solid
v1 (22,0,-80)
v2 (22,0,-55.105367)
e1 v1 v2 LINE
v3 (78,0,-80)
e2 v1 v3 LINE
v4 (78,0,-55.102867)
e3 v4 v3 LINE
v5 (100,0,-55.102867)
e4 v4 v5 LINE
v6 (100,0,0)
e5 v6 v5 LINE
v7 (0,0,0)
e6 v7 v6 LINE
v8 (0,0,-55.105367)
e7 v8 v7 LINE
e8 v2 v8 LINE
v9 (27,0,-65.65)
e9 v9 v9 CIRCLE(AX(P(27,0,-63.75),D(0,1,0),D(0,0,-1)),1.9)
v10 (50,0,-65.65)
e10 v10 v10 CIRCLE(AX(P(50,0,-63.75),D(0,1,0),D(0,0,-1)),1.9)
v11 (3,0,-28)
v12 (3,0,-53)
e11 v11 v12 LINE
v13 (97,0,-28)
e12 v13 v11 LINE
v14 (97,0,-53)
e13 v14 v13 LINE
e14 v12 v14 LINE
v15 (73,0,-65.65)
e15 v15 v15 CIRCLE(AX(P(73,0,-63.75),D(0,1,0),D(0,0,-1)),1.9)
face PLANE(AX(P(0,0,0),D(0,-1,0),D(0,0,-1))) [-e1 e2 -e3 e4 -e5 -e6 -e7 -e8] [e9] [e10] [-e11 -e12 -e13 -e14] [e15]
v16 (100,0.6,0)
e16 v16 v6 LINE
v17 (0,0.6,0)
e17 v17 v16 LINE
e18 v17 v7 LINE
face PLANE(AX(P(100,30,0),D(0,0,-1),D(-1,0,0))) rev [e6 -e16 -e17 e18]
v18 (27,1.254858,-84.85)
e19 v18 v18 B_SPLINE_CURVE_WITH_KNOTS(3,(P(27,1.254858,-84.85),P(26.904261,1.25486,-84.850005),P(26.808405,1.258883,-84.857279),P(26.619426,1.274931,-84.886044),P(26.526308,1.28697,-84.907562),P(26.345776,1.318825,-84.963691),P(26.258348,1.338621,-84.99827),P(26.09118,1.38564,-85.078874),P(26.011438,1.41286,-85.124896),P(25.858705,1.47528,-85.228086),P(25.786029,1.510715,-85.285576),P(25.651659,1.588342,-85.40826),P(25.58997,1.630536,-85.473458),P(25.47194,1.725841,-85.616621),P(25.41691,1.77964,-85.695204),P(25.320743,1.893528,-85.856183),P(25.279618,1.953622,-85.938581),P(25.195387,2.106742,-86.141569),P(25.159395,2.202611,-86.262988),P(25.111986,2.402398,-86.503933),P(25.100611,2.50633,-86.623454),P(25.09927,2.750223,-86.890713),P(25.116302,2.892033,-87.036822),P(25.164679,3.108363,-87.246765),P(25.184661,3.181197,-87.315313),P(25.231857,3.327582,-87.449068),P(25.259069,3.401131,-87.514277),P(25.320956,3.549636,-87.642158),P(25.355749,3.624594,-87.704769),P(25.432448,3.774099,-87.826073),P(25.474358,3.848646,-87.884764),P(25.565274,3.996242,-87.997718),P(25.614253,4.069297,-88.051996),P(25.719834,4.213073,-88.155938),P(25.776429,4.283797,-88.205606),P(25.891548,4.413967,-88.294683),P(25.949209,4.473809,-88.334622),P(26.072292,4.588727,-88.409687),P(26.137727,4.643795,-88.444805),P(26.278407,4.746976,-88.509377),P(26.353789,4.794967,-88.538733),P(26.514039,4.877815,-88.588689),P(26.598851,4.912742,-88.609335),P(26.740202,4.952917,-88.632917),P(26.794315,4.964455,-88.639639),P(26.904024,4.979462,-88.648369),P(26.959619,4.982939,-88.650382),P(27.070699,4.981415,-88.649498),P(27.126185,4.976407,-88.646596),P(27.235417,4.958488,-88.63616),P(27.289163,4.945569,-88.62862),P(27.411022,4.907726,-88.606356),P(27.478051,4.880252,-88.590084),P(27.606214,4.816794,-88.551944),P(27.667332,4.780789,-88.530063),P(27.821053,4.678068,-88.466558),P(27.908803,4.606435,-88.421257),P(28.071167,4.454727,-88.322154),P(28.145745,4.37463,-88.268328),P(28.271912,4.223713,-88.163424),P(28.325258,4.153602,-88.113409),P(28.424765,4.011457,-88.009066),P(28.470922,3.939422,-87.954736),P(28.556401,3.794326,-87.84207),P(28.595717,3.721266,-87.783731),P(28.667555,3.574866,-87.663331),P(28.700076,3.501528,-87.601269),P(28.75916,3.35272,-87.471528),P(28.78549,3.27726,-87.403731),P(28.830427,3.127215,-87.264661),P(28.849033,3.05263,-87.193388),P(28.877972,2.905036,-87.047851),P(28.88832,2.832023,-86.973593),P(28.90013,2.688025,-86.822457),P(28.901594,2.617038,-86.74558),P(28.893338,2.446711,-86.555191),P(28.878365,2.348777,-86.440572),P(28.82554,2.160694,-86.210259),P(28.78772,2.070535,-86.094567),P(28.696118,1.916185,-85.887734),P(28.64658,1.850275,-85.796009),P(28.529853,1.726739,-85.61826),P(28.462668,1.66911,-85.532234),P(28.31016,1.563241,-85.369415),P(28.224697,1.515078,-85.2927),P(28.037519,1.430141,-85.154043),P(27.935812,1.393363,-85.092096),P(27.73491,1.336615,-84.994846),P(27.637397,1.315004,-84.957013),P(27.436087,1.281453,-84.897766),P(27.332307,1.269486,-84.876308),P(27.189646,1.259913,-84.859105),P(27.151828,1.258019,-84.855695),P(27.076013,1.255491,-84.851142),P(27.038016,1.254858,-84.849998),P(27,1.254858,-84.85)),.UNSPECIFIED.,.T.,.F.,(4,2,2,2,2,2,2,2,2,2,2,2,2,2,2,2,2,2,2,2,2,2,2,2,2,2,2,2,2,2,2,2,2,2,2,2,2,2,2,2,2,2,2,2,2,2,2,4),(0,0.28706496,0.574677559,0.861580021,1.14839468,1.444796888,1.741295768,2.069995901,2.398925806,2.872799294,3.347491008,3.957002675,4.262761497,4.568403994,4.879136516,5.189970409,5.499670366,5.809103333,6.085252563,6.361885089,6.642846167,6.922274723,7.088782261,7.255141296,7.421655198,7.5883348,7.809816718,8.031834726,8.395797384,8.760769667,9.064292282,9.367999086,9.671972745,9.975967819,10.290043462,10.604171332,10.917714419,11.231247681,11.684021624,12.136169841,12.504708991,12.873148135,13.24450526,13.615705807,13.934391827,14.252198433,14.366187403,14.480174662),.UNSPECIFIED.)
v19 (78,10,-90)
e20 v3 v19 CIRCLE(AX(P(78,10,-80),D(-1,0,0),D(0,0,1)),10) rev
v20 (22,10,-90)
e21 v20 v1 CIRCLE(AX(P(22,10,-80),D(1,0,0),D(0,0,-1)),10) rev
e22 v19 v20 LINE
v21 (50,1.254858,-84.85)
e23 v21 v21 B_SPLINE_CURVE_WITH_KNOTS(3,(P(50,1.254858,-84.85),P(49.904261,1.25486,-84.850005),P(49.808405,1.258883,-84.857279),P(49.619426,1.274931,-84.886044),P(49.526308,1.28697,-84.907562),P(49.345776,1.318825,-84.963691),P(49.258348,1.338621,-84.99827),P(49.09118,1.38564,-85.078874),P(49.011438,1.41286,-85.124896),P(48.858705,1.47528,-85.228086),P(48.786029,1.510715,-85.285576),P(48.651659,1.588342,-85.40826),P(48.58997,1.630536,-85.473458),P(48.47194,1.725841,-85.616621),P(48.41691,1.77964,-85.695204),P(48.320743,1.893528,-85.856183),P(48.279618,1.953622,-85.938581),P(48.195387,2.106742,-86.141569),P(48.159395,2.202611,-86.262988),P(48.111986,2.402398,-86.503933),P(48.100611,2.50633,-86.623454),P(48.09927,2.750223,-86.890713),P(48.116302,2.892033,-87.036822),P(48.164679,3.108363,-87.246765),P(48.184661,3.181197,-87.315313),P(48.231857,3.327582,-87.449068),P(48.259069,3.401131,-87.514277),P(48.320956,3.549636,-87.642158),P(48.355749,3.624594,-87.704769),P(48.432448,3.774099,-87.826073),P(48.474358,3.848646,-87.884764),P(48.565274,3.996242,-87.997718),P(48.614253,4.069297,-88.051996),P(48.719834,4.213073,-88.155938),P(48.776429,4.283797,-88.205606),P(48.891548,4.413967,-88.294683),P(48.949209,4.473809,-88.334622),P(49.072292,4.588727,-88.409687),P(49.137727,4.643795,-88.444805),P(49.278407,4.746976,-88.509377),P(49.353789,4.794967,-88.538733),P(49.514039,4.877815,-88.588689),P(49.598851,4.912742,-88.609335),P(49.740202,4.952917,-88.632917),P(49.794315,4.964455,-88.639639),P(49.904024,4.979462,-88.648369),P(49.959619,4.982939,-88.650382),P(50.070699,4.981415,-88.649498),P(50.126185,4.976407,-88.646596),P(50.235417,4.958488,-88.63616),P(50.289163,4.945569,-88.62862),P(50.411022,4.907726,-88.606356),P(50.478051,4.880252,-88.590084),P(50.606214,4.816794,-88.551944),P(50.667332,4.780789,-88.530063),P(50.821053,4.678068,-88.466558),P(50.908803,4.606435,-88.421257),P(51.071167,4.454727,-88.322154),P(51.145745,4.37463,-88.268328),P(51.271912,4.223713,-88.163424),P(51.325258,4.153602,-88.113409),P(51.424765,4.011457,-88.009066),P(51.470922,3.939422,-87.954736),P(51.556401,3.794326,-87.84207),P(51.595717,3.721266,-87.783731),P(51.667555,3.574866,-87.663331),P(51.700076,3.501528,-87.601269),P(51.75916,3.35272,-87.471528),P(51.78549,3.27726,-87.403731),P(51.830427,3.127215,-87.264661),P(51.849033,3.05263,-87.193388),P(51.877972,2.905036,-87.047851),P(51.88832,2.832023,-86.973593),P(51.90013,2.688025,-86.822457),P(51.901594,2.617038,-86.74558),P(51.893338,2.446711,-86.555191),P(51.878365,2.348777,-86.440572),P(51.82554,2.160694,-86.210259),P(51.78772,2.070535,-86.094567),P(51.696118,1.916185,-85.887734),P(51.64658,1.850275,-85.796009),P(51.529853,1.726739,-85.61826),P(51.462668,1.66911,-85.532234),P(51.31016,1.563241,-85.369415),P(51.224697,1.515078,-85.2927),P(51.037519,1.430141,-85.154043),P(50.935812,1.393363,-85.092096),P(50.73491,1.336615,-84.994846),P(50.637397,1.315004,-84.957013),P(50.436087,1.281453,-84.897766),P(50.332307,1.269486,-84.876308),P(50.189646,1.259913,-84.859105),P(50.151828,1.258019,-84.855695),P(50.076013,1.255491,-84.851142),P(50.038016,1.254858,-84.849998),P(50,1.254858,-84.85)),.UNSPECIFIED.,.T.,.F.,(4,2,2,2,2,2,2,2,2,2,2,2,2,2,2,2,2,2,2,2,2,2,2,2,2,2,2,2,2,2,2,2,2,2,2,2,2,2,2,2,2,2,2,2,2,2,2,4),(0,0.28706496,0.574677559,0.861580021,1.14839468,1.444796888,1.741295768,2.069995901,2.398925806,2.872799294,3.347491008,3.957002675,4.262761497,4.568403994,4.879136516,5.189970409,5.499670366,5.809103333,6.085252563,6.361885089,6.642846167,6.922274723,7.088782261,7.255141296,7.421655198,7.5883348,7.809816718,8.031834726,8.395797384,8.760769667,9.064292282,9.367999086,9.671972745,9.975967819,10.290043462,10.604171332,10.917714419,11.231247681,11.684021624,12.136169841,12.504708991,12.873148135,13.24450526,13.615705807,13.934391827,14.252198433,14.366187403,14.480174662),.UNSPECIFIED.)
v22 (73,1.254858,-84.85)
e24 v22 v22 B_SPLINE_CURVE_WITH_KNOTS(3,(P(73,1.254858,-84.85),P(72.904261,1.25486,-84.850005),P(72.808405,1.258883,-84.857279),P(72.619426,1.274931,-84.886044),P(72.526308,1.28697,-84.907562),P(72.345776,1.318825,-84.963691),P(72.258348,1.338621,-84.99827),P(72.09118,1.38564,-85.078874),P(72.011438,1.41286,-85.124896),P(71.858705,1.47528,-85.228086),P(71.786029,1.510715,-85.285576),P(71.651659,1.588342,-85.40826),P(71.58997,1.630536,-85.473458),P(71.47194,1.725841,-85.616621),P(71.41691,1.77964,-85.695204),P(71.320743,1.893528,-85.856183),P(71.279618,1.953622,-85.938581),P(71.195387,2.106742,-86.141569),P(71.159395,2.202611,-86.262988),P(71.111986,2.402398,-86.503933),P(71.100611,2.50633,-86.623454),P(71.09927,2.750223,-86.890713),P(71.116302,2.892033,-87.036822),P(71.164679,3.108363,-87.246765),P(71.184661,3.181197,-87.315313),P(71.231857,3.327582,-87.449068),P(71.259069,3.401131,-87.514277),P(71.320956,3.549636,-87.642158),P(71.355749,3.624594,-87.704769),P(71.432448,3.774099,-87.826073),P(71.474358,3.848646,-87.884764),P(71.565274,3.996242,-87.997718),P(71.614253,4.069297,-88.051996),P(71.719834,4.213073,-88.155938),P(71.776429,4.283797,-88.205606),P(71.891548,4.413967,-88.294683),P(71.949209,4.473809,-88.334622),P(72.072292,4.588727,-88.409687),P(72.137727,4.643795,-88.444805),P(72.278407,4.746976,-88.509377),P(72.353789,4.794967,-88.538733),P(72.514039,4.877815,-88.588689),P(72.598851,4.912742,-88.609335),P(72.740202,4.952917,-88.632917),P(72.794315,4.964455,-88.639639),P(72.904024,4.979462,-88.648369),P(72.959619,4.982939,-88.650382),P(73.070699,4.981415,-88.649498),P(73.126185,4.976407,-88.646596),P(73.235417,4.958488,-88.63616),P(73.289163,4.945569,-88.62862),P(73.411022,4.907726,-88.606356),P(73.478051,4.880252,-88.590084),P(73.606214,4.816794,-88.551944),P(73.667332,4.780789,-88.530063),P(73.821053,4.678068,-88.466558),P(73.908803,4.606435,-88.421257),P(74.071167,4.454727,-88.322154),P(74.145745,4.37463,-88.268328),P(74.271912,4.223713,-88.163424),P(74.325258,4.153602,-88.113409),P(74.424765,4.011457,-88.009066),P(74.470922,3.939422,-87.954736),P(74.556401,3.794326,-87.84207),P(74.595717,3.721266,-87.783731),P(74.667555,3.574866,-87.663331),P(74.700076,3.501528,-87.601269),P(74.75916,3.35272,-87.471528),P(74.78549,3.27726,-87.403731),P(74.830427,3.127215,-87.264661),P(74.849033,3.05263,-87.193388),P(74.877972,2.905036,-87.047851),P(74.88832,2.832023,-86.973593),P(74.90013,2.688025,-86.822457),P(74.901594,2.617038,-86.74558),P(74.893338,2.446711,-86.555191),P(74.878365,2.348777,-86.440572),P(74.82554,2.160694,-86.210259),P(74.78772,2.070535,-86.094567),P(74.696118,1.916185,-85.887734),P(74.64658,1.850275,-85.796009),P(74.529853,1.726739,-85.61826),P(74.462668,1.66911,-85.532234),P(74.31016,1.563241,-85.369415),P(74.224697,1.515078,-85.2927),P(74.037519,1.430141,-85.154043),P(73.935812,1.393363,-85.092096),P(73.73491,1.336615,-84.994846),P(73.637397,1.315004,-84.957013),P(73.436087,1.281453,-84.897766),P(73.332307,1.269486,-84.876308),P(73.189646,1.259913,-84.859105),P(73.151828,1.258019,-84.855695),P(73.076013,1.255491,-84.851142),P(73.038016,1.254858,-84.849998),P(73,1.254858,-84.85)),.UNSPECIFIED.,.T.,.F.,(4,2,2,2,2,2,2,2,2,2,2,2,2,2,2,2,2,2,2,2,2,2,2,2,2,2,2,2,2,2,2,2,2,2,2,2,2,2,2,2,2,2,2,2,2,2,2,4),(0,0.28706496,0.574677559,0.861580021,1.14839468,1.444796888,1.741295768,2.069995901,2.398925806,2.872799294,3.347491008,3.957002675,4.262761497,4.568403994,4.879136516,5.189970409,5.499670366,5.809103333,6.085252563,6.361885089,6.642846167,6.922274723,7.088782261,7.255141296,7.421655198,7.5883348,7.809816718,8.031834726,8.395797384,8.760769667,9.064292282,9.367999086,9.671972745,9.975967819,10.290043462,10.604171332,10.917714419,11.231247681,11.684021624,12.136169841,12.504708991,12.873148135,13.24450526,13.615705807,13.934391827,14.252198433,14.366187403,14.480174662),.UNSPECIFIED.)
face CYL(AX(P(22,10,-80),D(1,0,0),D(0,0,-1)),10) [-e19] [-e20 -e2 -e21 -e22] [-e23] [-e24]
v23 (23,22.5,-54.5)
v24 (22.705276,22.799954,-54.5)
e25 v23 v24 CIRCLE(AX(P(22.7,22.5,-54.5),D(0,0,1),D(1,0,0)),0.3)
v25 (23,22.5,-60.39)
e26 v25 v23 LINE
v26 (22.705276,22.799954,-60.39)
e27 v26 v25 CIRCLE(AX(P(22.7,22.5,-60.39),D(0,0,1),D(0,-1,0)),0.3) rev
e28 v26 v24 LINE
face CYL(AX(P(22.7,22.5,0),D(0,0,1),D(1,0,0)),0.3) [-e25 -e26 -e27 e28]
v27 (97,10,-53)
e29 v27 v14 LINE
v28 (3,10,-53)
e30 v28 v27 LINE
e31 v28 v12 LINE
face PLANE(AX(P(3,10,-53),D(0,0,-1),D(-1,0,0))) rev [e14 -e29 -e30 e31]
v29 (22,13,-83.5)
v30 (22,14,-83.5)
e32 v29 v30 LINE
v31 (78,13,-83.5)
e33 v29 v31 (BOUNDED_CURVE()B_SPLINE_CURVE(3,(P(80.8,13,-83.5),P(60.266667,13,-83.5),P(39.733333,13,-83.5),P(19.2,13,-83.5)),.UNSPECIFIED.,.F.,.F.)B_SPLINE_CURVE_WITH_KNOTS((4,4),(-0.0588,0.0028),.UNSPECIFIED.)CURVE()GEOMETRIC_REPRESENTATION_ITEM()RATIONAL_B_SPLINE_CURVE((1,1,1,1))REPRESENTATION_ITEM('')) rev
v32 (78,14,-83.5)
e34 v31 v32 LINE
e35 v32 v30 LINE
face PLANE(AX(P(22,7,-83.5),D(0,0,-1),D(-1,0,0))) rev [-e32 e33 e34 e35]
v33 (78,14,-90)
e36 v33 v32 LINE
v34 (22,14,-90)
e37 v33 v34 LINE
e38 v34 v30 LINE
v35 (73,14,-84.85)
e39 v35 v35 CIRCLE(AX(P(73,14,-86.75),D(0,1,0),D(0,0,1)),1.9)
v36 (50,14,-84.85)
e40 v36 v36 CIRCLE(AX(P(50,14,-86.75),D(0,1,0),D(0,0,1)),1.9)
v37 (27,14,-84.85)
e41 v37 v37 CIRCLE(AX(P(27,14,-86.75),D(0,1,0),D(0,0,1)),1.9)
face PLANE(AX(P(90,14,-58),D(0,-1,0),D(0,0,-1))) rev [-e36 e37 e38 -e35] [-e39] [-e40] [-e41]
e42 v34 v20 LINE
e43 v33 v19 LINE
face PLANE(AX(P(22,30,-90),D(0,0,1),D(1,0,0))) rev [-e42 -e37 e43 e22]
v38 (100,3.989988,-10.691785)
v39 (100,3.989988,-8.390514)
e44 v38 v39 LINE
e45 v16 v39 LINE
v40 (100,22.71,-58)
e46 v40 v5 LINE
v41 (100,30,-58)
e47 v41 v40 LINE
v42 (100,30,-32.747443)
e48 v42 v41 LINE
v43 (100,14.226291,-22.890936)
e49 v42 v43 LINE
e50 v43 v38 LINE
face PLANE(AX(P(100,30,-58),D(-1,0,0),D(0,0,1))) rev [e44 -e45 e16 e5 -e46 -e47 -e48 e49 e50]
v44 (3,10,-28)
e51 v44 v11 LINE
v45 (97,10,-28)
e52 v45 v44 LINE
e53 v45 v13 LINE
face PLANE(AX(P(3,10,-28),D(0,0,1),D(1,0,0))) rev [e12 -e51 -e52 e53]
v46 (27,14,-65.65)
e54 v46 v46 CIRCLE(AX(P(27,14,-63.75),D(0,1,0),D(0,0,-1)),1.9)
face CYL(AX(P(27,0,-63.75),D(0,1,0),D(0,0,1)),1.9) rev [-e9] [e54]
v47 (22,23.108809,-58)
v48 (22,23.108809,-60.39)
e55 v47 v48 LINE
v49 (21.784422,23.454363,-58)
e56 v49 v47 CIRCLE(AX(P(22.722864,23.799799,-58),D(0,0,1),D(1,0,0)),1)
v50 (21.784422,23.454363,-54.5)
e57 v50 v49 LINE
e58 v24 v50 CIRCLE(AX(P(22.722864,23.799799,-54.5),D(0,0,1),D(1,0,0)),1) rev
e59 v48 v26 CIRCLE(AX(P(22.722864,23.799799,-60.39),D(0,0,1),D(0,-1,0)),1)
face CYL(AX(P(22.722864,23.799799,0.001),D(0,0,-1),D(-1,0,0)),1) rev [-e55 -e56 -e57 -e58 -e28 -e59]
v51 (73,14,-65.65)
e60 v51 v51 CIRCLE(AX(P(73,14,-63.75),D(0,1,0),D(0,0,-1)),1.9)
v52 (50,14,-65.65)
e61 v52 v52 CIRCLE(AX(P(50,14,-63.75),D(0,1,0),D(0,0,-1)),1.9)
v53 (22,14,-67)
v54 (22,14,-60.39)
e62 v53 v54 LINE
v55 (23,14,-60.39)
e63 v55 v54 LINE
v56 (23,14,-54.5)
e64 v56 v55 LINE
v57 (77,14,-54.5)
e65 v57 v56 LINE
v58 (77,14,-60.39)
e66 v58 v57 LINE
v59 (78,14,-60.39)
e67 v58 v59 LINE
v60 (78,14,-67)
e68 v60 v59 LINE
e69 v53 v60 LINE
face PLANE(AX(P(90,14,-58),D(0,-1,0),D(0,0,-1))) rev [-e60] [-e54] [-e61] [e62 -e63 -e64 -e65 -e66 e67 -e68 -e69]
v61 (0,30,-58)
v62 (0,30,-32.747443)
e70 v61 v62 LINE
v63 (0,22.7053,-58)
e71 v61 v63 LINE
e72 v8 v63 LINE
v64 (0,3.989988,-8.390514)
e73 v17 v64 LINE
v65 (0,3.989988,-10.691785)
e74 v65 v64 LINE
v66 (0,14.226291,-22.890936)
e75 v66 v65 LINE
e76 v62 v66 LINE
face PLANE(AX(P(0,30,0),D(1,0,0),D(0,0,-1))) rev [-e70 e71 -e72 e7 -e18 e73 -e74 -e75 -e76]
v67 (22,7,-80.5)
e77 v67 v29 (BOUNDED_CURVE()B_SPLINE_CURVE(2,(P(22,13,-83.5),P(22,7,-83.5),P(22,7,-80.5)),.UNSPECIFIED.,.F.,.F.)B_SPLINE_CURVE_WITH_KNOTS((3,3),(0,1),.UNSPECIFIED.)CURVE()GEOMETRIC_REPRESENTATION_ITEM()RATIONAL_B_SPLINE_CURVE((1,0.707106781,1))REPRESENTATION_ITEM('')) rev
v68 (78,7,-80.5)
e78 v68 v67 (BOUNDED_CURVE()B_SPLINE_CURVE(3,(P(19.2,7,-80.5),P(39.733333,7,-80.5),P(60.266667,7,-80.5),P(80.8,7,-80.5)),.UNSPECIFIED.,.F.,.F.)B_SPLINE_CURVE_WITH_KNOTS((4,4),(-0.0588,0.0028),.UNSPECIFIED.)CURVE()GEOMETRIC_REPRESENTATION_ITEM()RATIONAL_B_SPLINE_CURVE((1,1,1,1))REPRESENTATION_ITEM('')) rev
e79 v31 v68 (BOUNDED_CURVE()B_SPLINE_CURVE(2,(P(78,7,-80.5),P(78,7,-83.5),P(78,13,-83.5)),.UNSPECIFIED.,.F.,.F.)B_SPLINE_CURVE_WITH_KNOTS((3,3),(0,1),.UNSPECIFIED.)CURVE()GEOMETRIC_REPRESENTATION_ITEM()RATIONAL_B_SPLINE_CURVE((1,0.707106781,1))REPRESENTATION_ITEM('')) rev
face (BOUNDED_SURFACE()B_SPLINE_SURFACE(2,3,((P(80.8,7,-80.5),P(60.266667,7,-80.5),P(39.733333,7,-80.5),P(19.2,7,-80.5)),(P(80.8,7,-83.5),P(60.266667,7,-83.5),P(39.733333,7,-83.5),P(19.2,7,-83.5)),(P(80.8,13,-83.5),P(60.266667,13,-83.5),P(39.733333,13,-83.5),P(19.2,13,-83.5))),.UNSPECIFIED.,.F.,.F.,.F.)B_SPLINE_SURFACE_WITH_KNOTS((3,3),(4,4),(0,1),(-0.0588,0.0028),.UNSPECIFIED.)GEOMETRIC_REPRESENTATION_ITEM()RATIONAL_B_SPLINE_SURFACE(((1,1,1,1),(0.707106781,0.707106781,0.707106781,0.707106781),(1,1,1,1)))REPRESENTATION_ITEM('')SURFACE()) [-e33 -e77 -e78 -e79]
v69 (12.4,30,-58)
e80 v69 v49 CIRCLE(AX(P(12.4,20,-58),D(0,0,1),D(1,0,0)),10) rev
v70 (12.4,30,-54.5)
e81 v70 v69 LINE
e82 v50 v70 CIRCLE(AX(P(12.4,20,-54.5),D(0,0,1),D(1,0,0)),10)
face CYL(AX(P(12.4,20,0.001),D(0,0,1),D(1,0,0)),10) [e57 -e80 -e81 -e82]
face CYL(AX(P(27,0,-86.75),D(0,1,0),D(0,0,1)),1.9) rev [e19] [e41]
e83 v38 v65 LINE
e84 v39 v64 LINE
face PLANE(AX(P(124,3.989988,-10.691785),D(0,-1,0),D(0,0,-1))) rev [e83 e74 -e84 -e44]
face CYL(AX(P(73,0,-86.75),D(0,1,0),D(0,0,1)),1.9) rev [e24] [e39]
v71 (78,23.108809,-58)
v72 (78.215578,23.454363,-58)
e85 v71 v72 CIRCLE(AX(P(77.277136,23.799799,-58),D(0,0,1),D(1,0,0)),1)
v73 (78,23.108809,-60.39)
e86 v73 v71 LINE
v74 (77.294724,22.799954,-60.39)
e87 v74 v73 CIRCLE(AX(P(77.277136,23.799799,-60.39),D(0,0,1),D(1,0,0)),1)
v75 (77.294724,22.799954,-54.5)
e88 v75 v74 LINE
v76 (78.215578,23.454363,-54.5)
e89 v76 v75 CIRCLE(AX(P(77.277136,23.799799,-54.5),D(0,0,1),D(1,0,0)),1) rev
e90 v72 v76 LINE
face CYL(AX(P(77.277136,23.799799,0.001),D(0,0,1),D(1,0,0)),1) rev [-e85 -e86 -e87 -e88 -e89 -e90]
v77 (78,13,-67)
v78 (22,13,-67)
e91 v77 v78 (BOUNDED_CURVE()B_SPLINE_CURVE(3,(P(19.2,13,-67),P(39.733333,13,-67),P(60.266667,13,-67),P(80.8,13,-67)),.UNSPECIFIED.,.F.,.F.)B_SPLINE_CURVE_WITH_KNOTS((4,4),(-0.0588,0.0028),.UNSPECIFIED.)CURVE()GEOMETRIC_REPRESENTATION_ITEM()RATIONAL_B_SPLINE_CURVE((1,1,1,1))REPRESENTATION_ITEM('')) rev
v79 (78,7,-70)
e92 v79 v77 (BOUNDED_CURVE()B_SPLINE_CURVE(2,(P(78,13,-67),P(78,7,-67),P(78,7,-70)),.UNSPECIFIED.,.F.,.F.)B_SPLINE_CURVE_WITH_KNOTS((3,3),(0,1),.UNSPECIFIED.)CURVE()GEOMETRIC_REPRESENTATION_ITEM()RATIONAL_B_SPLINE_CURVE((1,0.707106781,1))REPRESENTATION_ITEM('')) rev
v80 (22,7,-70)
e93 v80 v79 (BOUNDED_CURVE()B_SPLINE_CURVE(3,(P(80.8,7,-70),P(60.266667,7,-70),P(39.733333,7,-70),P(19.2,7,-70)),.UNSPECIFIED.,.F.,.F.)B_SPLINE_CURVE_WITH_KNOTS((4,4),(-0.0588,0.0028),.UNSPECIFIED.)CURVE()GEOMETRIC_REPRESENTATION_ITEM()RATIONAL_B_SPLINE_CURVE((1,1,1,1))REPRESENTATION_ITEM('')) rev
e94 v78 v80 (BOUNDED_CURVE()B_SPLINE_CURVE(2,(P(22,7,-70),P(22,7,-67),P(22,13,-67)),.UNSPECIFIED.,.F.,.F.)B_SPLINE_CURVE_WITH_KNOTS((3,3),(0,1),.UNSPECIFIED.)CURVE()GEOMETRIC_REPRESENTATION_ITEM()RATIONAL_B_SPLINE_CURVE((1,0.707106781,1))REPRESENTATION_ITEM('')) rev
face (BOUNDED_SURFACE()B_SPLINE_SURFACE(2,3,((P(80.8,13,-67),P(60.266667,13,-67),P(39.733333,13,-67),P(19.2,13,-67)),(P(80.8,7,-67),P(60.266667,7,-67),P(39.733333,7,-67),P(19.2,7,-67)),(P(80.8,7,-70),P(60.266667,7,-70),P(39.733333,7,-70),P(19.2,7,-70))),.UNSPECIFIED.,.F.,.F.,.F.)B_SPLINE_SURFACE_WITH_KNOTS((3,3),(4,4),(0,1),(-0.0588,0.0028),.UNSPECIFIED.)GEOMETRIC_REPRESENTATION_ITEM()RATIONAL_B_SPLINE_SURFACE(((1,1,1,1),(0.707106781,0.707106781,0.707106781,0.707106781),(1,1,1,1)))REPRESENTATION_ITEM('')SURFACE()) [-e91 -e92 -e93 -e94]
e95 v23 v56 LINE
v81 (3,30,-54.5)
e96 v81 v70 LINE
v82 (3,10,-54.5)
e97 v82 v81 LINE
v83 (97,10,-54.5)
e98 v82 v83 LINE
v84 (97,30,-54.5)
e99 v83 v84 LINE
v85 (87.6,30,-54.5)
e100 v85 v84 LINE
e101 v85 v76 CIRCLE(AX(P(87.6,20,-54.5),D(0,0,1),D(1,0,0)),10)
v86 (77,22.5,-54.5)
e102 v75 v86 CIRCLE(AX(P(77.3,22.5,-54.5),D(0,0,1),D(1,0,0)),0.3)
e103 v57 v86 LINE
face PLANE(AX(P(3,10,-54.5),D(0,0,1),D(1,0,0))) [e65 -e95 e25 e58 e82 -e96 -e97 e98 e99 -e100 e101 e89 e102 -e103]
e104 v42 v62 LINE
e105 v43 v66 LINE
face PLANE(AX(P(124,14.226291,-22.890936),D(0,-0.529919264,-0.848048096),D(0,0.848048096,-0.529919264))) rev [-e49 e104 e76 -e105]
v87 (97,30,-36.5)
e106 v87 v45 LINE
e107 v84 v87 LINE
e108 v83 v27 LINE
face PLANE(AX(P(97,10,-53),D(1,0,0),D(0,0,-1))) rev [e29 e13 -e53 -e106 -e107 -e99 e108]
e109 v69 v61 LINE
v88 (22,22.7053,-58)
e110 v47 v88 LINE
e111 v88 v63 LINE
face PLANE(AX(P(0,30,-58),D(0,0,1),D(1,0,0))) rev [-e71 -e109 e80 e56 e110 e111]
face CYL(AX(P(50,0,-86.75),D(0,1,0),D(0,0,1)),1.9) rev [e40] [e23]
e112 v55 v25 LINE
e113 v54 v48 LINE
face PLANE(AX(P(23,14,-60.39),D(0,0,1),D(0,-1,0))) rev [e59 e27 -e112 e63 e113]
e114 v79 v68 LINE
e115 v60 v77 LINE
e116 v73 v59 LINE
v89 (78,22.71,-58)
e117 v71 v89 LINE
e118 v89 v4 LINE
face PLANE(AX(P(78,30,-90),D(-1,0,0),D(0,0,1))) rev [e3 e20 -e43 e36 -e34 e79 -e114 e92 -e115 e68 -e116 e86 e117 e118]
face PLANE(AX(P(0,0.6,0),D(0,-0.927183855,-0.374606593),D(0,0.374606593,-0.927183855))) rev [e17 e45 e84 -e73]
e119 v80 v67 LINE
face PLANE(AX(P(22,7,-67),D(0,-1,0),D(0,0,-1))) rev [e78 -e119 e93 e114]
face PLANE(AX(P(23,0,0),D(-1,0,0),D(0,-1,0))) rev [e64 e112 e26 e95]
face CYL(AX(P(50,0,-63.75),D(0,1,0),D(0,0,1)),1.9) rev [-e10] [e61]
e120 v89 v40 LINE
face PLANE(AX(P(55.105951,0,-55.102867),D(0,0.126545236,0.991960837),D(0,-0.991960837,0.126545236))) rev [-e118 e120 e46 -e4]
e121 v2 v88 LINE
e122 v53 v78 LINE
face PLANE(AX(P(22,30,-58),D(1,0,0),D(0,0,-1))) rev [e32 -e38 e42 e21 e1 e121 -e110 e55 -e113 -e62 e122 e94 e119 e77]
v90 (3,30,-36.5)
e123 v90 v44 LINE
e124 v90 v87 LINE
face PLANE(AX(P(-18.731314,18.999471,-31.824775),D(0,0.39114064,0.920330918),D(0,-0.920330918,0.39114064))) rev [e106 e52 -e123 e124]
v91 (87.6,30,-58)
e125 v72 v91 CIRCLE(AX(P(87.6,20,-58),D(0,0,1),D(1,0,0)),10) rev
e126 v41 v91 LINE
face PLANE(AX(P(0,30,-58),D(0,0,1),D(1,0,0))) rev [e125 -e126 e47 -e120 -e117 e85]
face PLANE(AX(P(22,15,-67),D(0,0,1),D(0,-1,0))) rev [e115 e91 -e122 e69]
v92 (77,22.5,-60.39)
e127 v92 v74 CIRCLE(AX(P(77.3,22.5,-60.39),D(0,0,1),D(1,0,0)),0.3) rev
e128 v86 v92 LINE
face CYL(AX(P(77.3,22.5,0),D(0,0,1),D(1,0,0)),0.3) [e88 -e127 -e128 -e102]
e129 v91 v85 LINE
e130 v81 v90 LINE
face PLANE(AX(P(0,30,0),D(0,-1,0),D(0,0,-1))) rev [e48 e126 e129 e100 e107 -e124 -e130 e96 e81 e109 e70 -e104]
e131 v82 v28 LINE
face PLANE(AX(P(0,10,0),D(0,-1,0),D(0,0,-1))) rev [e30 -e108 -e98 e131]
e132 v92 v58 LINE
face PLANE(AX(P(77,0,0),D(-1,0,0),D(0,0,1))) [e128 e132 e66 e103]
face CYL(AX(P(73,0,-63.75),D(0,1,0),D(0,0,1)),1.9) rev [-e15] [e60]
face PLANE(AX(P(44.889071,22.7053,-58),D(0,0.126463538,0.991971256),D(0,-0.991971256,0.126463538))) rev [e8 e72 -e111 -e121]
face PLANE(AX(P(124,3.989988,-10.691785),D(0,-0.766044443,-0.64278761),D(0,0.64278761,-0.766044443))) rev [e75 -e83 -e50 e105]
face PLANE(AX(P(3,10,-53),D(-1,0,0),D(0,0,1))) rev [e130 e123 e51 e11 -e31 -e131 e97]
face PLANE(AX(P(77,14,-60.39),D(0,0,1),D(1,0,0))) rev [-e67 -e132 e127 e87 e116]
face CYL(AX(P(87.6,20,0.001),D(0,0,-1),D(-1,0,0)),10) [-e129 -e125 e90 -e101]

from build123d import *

# Parameters (mm, degrees)
RESSALTO_EXTRUS_O1_DEPTH = 30
CORTE_EXTRUS_O1_DEPTH    = 100
ESBO_O4_W                = 94
ESBO_O4_H                = 25
CORTE_EXTRUS_O2_DEPTH    = 10
ESBO_O5_W                = 94
ESBO_O5_H                = 18
CORTE_EXTRUS_O3_DEPTH    = 20
CORTE_EXTRUS_O7_START    = -3
CORTE_EXTRUS_O7_DEPTH    = 94
ESBO_O8_W                = 32
ESBO_O8_H                = 15
CORTE_EXTRUS_O8_DEPTH    = 56
ESBO_O9_W                = 16.5
ESBO_O9_H                = 8
CORTE_EXTRUS_O9_DEPTH    = 56
FILETE1_SIZE             = 3
FILETE1_SIZE_2           = 6
FILETE2_SIZE             = 3
FILETE2_SIZE_2           = 6
FILETE3_R                = 10
ESBO_O12_W               = 32
ESBO_O12_H               = 1
CORTE_EXTRUS_O12_DEPTH   = 68
CORTE_EXTRUS_O13_REACH   = 121.432
ESBO_O14_W               = 56
ESBO_O14_H               = 16
CORTE_EXTRUS_O14_DEPTH   = 138.840487586
ESBO_O16_R               = 1.9
CORTE_EXTRUS_O15_DEPTH   = 136.484316502
ESBO_O19_W               = 5.89
ESBO_O19_H               = 8.8
RESSALTO_EXTRUS_O4_DEPTH = 1
ESBO_O20_W               = 5.89
ESBO_O20_H               = 8.8
RESSALTO_EXTRUS_O5_DEPTH = 1
FILETE5_R                = 10
FILETE6_R                = 0.3
FILETE7_R                = 1
CORTE_EXTRUS_O17_DEPTH   = 22
CORTE_EXTRUS_O18_DEPTH   = 22
CORTE_EXTRUS_O19_DEPTH   = 124


with BuildPart() as part:
    # Esboço2 → Ressalto-extrusão1 (new body)
    with BuildSketch(Plane(origin=(0, 0, 0), x_dir=(1, 0, 0), z_dir=(0, 1, 0))):
        Polygon((0, 0), (0, 58), (22, 58), (22, 90), (78, 90), (78, 58), (100, 58), (100, 0), align=None)
    extrude(amount=RESSALTO_EXTRUS_O1_DEPTH)

    # Esboço3 → Corte-extrusão1 (cut)
    with BuildSketch(Plane(origin=(100, 0, 0), x_dir=(0, 0, -1), z_dir=(1, 0, 0))):
        Polygon((0, 0.6), (9.828405069, 4.570933406), (22.126818959, 14.890527965), (31.568264957, 30), (0, 30), align=None)
    extrude(amount=-CORTE_EXTRUS_O1_DEPTH, mode=Mode.SUBTRACT)

    # Esboço4 → Corte-extrusão2 (cut)
    with BuildSketch(Plane.XZ):
        with Locations((50, -40.5)):
            Rectangle(ESBO_O4_W, ESBO_O4_H)
    extrude(amount=-CORTE_EXTRUS_O2_DEPTH, mode=Mode.SUBTRACT)

    # Esboço5 → Corte-extrusão3 (cut)
    with BuildSketch(Plane(origin=(0, 30, 0), x_dir=(1, 0, 0), z_dir=(0, 1, 0))):
        with Locations((50, 45.5)):
            Rectangle(ESBO_O5_W, ESBO_O5_H)
    extrude(amount=-CORTE_EXTRUS_O3_DEPTH, mode=Mode.SUBTRACT)

    # Esboço7 → Corte-extrusão7 (cut)
    with BuildSketch(Plane(origin=(100, 0, 0), x_dir=(0, 0, -1), z_dir=(1, 0, 0)).offset(CORTE_EXTRUS_O7_START)):
        Polygon((28, 10), (36.5, 30), (36.5, 10), align=None)
    extrude(amount=-CORTE_EXTRUS_O7_DEPTH, mode=Mode.SUBTRACT)

    # Esboço8 → Corte-extrusão8 (cut)
    with BuildSketch(Plane(origin=(78, 0, 0), x_dir=(0, 0, -1), z_dir=(1, 0, 0))):
        with Locations((74, 22.5)):
            Rectangle(ESBO_O8_W, ESBO_O8_H)
    extrude(amount=-CORTE_EXTRUS_O8_DEPTH, mode=Mode.SUBTRACT)

    # Esboço9 → Corte-extrusão9 (cut)
    with BuildSketch(Plane(origin=(78, 0, 0), x_dir=(0, 0, -1), z_dir=(1, 0, 0))):
        with Locations((75.25, 11)):
            Rectangle(ESBO_O9_W, ESBO_O9_H)
    extrude(amount=-CORTE_EXTRUS_O9_DEPTH, mode=Mode.SUBTRACT)

    # Filete1
    # an asymmetric fillet: 6, 3 mm, written as the material it adds along each edge
    with BuildSketch(Plane(origin=(78, 7, -67), x_dir=(0, 0, -1), z_dir=(-1, 0, 0))) as filete1_piece_1:
        with BuildLine():
            Bezier((FILETE1_SIZE, 0), (0, 0), (0, -FILETE1_SIZE_2), weights=[1, 0.707106781, 1])
            Line((0, -FILETE1_SIZE_2), (0, 0))
            Line((0, 0), (FILETE1_SIZE, 0))
        make_face()
    extrude(amount=56)

    # Filete2
    # an asymmetric fillet: 6, 3 mm, written as the material it adds along each edge
    with BuildSketch(Plane(origin=(78, 7, -83.5), x_dir=(0, 0, 1), z_dir=(-1, 0, 0))) as filete2_piece_1:
        with BuildLine():
            Bezier((FILETE2_SIZE, 0), (0, 0), (0, FILETE2_SIZE_2), weights=[1, 0.707106781, 1])
            Line((0, FILETE2_SIZE_2), (0, 0))
            Line((0, 0), (FILETE2_SIZE, 0))
        make_face()
    extrude(amount=56)

    # Filete3
    filete3_edges = [part.edges().sort_by_distance(p)[0] for p in [
        (50, 0, -90),
    ]]
    fillet(filete3_edges, radius=FILETE3_R)

    # Esboço12 → Corte-extrusão12 (cut)
    with BuildSketch(Plane.ZY.offset(-22)):
        with Locations((-74, 14.5)):
            Rectangle(ESBO_O12_W, ESBO_O12_H)
    extrude(amount=-CORTE_EXTRUS_O12_DEPTH, mode=Mode.SUBTRACT)

    # Esboço14 → Corte-extrusão13 (cut, up to next)
    with BuildSketch(Plane(origin=(0, 0, -58), x_dir=(-1, 0, 0), z_dir=(0, 0, -1)), mode=Mode.PRIVATE) as corte_extrus_o13_sk1:
        with Locations((-50, 22)):
            Rectangle(ESBO_O14_W, ESBO_O14_H)
    corte_extrus_o13_tool1 = extrude(corte_extrus_o13_sk1.sketch, amount=-CORTE_EXTRUS_O13_REACH, mode=Mode.PRIVATE) & part.part
    add(corte_extrus_o13_tool1.solids().sort_by_distance((50, 22, -58))[0], mode=Mode.SUBTRACT)

    # Esboço15 → Corte-extrusão14 (cut, through all)
    with BuildSketch(Plane(origin=(100, 0, 0), x_dir=(0, 0, -1), z_dir=(1, 0, 0))):
        Polygon((9.048997211, 4.256032191), (10.048997211, 4.256032191), (10.048997211, 4.756032191), align=None)
    extrude(amount=-CORTE_EXTRUS_O14_DEPTH, mode=Mode.SUBTRACT)

    # Esboço16 → Corte-extrusão15 (cut, through all)
    with BuildSketch(Plane(origin=(0, 14, 0), x_dir=(1, 0, 0), z_dir=(0, 1, 0))):
        with Locations(Location((73, 86.75, 0), (0, 0, 270))):
            Circle(ESBO_O16_R)
        with Locations(Location((27, 86.75, 0), (0, 0, 270))):
            Circle(ESBO_O16_R)
        with Locations(Location((73, 63.75, 0), (0, 0, 90))):
            Circle(ESBO_O16_R)
        with Locations(Location((27, 63.75, 0), (0, 0, 90))):
            Circle(ESBO_O16_R)
        with Locations(Location((50, 86.75, 0), (0, 0, 270))):
            Circle(ESBO_O16_R)
        with Locations(Location((50, 63.75, 0), (0, 0, 90))):
            Circle(ESBO_O16_R)
    extrude(amount=-CORTE_EXTRUS_O15_DEPTH, mode=Mode.SUBTRACT)

    # Esboço19 → Ressalto-extrusão4 (add)
    with BuildSketch(Plane.ZY.offset(-78)):
        with Locations((-57.445, 18.4)):
            Rectangle(ESBO_O19_W, ESBO_O19_H)
    extrude(amount=RESSALTO_EXTRUS_O4_DEPTH)

    # Esboço20 → Ressalto-extrusão5 (add)
    with BuildSketch(Plane(origin=(22, 0, 0), x_dir=(0, 0, -1), z_dir=(1, 0, 0))):
        with Locations((57.445, 18.4)):
            Rectangle(ESBO_O20_W, ESBO_O20_H)
    extrude(amount=RESSALTO_EXTRUS_O5_DEPTH)

    # Filete5
    # the kernel refuses this fillet: 10 mm, written as the material it takes off along each edge
    with BuildSketch(Plane(origin=(22, 30, -82), x_dir=(0, -1, 0), z_dir=(0, 0, 1))) as filete5_piece_1_section:
        with BuildLine():
            CenterArc((10, -9.6), FILETE5_R, 106.260204708, 73.739795292)
            Line((0, -9.6), (0, 0))
            Line((0, 0), (7.2, 0))
        make_face()
    filete5_piece_1 = extrude(amount=51.5, mode=Mode.PRIVATE)
    filete5_piece_1 = split(filete5_piece_1, bisect_by=Plane(origin=(18.412, 35.429115934, -38.807374272), z_dir=(0, -0.39114064034485163, -0.9203309184584747)), keep=Keep.TOP, mode=Mode.PRIVATE)
    add(filete5_piece_1, mode=Mode.SUBTRACT)
    with BuildSketch(Plane(origin=(78, 30, -82), x_dir=(0, -1, 0), z_dir=(0, 0, 1))) as filete5_piece_2_section:
        with BuildLine():
            CenterArc((10, 9.6), FILETE5_R, 180, 73.739795292)
            Line((0, 9.6), (0, 0))
            Line((0, 0), (7.2, 0))
        make_face()
    filete5_piece_2 = extrude(amount=51.5, mode=Mode.PRIVATE)
    filete5_piece_2 = split(filete5_piece_2, bisect_by=Plane(origin=(81.588, 35.429115934, -38.807374272), z_dir=(0, -0.39114064034485163, -0.9203309184584747)), keep=Keep.TOP, mode=Mode.PRIVATE)
    add(filete5_piece_2, mode=Mode.SUBTRACT)

    # Filete6
    filete6_edges = [part.edges().sort_by_distance(p)[0] for p in [
        (77, 22.8, -57.445),
        (23, 22.8, -57.445),
    ]]
    fillet(filete6_edges, radius=FILETE6_R)

    # Filete7
    # the kernel refuses this fillet: 1 mm, written as the material it adds along each edge
    with BuildSketch(Plane(origin=(22, 22.8, -62.231658327), x_dir=(0.9999999978354762, -6.579549656677086e-05, 0), z_dir=(0, 0, 1))) as filete7_piece_1_section:
        with BuildLine():
            CenterArc((0.722798557, 0.999846475), FILETE7_R, 200.212199082, 68.783803201)
            Line((-0.215620926, 0.654348465), (-0.309462874, 0.619798664))
            ThreePointArc((-0.309462874, 0.619798664), (-0.197149972, 0.297735075), (-0.095998158, -0.028006316))
            Line((-0.095998158, -0.028006316), (6.58e-06, -0.1))
            ThreePointArc((6.58e-06, -0.1), (0.700006578, -0.099953943), (0.703524171, -0.099984648))
            Line((0.703524171, -0.099984648), (0.705276388, 0))
        make_face()
    filete7_piece_1 = extrude(amount=7.731658327, mode=Mode.PRIVATE)
    filete7_piece_1 = split(filete7_piece_1, bisect_by=Plane(origin=(22.2637133, 22.819694308, -60.39), z_dir=(0, 0, 1)), keep=Keep.TOP, mode=Mode.PRIVATE)
    filete7_piece_1 = split(filete7_piece_1, bisect_by=Plane(origin=(22, 22.819694308, -59.195), z_dir=(1, 0, 0)), keep=Keep.TOP, mode=Mode.PRIVATE)
    filete7_piece_1 = split(filete7_piece_1, bisect_by=Plane(origin=(22.2637133, 22.819694308, -58), z_dir=(0, 0, -1)), keep=Keep.TOP, mode=Mode.PRIVATE)
    add(filete7_piece_1)
    with BuildSketch(Plane(origin=(22, 22.8, -58), x_dir=(0.9999999978354763, -6.579549656677353e-05, 0), z_dir=(0, 0, 1))) as filete7_piece_2_section:
        with BuildLine():
            CenterArc((0.722798557, 0.999846475), FILETE7_R, 200.212199082, 68.783803201)
            Line((-0.215620926, 0.654348465), (-0.309462874, 0.619798664))
            ThreePointArc((-0.309462874, 0.619798664), (-0.197149972, 0.297735075), (-0.095998158, -0.028006316))
            Line((-0.095998158, -0.028006316), (6.58e-06, -0.1))
            ThreePointArc((6.58e-06, -0.1), (0.700006578, -0.099953943), (0.703524171, -0.099984648))
            Line((0.703524171, -0.099984648), (0.705276388, 0))
        make_face()
    filete7_piece_2 = extrude(amount=3.5, mode=Mode.PRIVATE)
    filete7_piece_2 = split(filete7_piece_2, bisect_by=Plane(origin=(22, 22.819694308, -56.25), z_dir=(1, 0, 0)), keep=Keep.TOP, mode=Mode.PRIVATE)
    add(filete7_piece_2)
    with BuildSketch(Plane(origin=(22, 22.8, -58), x_dir=(0.9999999978354763, -6.579549656677353e-05, 0), z_dir=(0, 0, 1))) as filete7_piece_3_section:
        with BuildLine():
            CenterArc((0.722798557, 0.999846475), FILETE7_R, 200.212199082, 68.783803201)
            Line((-0.215620926, 0.654348465), (-0.309462874, 0.619798664))
            ThreePointArc((-0.309462874, 0.619798664), (-0.197149972, 0.297735075), (-0.095998158, -0.028006316))
            Line((-0.095998158, -0.028006316), (6.58e-06, -0.1))
            ThreePointArc((6.58e-06, -0.1), (0.700006578, -0.099953943), (0.703524171, -0.099984648))
            Line((0.703524171, -0.099984648), (0.705276388, 0))
        make_face()
    filete7_piece_3 = extrude(amount=3.5, mode=Mode.PRIVATE)
    filete7_piece_3 = split(filete7_piece_3, bisect_by=Plane(origin=(22, 23.088269834, -56.25), z_dir=(-1, 0, 0)), keep=Keep.TOP, mode=Mode.PRIVATE)
    add(filete7_piece_3)
    with BuildSketch(Plane(origin=(78, 22.8, -62.231658327), x_dir=(-0.9999999978354763, -6.579549656677353e-05, 0), z_dir=(0, 0, 1))) as filete7_piece_4_section:
        with BuildLine():
            CenterArc((0.722798557, -0.999846475), FILETE7_R, 91.003997717, 68.783803201)
            Line((-0.215620926, -0.654348465), (-0.309462874, -0.619798664))
            ThreePointArc((-0.309462874, -0.619798664), (-0.197149972, -0.297735075), (-0.095998158, 0.028006316))
            Line((-0.095998158, 0.028006316), (6.58e-06, 0.1))
            ThreePointArc((6.58e-06, 0.1), (0.700006578, 0.099953943), (0.703524171, 0.099984648))
            Line((0.703524171, 0.099984648), (0.705276388, 0))
        make_face()
    filete7_piece_4 = extrude(amount=7.731658327, mode=Mode.PRIVATE)
    filete7_piece_4 = split(filete7_piece_4, bisect_by=Plane(origin=(78, 22.819694308, -59.195), z_dir=(-1, 0, 0)), keep=Keep.TOP, mode=Mode.PRIVATE)
    filete7_piece_4 = split(filete7_piece_4, bisect_by=Plane(origin=(77.7362867, 22.819694308, -60.39), z_dir=(0, 0, 1)), keep=Keep.TOP, mode=Mode.PRIVATE)
    filete7_piece_4 = split(filete7_piece_4, bisect_by=Plane(origin=(77.7362867, 22.819694308, -58), z_dir=(0, 0, -1)), keep=Keep.TOP, mode=Mode.PRIVATE)
    add(filete7_piece_4)
    with BuildSketch(Plane(origin=(78, 22.8, -58), x_dir=(-0.9999999978354763, -6.57954965667722e-05, 0), z_dir=(0, 0, 1))) as filete7_piece_5_section:
        with BuildLine():
            CenterArc((0.722798557, -0.999846475), FILETE7_R, 91.003997717, 68.783803201)
            Line((-0.215620926, -0.654348465), (-0.309462874, -0.619798664))
            ThreePointArc((-0.309462874, -0.619798664), (-0.197149972, -0.297735075), (-0.095998158, 0.028006316))
            Line((-0.095998158, 0.028006316), (6.58e-06, 0.1))
            ThreePointArc((6.58e-06, 0.1), (0.700006578, 0.099953943), (0.703524171, 0.099984648))
            Line((0.703524171, 0.099984648), (0.705276388, 0))
        make_face()
    filete7_piece_5 = extrude(amount=3.5, mode=Mode.PRIVATE)
    filete7_piece_5 = split(filete7_piece_5, bisect_by=Plane(origin=(78, 22.819694308, -56.25), z_dir=(-1, 0, 0)), keep=Keep.TOP, mode=Mode.PRIVATE)
    add(filete7_piece_5)
    with BuildSketch(Plane(origin=(78, 22.8, -58), x_dir=(-0.9999999978354763, -6.57954965667722e-05, 0), z_dir=(0, 0, 1))) as filete7_piece_6_section:
        with BuildLine():
            CenterArc((0.722798557, -0.999846475), FILETE7_R, 91.003997717, 68.783803201)
            Line((-0.215620926, -0.654348465), (-0.309462874, -0.619798664))
            ThreePointArc((-0.309462874, -0.619798664), (-0.197149972, -0.297735075), (-0.095998158, 0.028006316))
            Line((-0.095998158, 0.028006316), (6.58e-06, 0.1))
            ThreePointArc((6.58e-06, 0.1), (0.700006578, 0.099953943), (0.703524171, 0.099984648))
            Line((0.703524171, 0.099984648), (0.705276388, 0))
        make_face()
    filete7_piece_6 = extrude(amount=3.5, mode=Mode.PRIVATE)
    filete7_piece_6 = split(filete7_piece_6, bisect_by=Plane(origin=(78, 23.088269834, -56.25), z_dir=(1, 0, 0)), keep=Keep.TOP, mode=Mode.PRIVATE)
    add(filete7_piece_6)

    # Esboço22 → Corte-extrusão17 (cut)
    with BuildSketch(Plane.ZY):
        Polygon((-58, 0), (-58, 22.70530007), (-55.105367164, 0), align=None)
    extrude(amount=-CORTE_EXTRUS_O17_DEPTH, mode=Mode.SUBTRACT)

    # Esboço23 → Corte-extrusão18 (cut)
    with BuildSketch(Plane(origin=(100, 0, 0), x_dir=(0, 0, -1), z_dir=(1, 0, 0))):
        Polygon((58, 0), (55.102867158, 0), (58, 22.71), align=None)
    extrude(amount=-CORTE_EXTRUS_O18_DEPTH, mode=Mode.SUBTRACT)

    # Esboço27 → Corte-extrusão19 (cut)
    with BuildSketch(Plane.ZY):
        Polygon((-31.568264957, 30), (-22.126818959, 14.890527965), (-10.048997211, 4.756032191), (-7.995032748, 3.989987748), (-10.691784821, 3.989987748), (-22.89093609, 14.226291078), (-32.747443361, 30), align=None)
    extrude(amount=-CORTE_EXTRUS_O19_DEPTH, mode=Mode.SUBTRACT)


solid = part.part
